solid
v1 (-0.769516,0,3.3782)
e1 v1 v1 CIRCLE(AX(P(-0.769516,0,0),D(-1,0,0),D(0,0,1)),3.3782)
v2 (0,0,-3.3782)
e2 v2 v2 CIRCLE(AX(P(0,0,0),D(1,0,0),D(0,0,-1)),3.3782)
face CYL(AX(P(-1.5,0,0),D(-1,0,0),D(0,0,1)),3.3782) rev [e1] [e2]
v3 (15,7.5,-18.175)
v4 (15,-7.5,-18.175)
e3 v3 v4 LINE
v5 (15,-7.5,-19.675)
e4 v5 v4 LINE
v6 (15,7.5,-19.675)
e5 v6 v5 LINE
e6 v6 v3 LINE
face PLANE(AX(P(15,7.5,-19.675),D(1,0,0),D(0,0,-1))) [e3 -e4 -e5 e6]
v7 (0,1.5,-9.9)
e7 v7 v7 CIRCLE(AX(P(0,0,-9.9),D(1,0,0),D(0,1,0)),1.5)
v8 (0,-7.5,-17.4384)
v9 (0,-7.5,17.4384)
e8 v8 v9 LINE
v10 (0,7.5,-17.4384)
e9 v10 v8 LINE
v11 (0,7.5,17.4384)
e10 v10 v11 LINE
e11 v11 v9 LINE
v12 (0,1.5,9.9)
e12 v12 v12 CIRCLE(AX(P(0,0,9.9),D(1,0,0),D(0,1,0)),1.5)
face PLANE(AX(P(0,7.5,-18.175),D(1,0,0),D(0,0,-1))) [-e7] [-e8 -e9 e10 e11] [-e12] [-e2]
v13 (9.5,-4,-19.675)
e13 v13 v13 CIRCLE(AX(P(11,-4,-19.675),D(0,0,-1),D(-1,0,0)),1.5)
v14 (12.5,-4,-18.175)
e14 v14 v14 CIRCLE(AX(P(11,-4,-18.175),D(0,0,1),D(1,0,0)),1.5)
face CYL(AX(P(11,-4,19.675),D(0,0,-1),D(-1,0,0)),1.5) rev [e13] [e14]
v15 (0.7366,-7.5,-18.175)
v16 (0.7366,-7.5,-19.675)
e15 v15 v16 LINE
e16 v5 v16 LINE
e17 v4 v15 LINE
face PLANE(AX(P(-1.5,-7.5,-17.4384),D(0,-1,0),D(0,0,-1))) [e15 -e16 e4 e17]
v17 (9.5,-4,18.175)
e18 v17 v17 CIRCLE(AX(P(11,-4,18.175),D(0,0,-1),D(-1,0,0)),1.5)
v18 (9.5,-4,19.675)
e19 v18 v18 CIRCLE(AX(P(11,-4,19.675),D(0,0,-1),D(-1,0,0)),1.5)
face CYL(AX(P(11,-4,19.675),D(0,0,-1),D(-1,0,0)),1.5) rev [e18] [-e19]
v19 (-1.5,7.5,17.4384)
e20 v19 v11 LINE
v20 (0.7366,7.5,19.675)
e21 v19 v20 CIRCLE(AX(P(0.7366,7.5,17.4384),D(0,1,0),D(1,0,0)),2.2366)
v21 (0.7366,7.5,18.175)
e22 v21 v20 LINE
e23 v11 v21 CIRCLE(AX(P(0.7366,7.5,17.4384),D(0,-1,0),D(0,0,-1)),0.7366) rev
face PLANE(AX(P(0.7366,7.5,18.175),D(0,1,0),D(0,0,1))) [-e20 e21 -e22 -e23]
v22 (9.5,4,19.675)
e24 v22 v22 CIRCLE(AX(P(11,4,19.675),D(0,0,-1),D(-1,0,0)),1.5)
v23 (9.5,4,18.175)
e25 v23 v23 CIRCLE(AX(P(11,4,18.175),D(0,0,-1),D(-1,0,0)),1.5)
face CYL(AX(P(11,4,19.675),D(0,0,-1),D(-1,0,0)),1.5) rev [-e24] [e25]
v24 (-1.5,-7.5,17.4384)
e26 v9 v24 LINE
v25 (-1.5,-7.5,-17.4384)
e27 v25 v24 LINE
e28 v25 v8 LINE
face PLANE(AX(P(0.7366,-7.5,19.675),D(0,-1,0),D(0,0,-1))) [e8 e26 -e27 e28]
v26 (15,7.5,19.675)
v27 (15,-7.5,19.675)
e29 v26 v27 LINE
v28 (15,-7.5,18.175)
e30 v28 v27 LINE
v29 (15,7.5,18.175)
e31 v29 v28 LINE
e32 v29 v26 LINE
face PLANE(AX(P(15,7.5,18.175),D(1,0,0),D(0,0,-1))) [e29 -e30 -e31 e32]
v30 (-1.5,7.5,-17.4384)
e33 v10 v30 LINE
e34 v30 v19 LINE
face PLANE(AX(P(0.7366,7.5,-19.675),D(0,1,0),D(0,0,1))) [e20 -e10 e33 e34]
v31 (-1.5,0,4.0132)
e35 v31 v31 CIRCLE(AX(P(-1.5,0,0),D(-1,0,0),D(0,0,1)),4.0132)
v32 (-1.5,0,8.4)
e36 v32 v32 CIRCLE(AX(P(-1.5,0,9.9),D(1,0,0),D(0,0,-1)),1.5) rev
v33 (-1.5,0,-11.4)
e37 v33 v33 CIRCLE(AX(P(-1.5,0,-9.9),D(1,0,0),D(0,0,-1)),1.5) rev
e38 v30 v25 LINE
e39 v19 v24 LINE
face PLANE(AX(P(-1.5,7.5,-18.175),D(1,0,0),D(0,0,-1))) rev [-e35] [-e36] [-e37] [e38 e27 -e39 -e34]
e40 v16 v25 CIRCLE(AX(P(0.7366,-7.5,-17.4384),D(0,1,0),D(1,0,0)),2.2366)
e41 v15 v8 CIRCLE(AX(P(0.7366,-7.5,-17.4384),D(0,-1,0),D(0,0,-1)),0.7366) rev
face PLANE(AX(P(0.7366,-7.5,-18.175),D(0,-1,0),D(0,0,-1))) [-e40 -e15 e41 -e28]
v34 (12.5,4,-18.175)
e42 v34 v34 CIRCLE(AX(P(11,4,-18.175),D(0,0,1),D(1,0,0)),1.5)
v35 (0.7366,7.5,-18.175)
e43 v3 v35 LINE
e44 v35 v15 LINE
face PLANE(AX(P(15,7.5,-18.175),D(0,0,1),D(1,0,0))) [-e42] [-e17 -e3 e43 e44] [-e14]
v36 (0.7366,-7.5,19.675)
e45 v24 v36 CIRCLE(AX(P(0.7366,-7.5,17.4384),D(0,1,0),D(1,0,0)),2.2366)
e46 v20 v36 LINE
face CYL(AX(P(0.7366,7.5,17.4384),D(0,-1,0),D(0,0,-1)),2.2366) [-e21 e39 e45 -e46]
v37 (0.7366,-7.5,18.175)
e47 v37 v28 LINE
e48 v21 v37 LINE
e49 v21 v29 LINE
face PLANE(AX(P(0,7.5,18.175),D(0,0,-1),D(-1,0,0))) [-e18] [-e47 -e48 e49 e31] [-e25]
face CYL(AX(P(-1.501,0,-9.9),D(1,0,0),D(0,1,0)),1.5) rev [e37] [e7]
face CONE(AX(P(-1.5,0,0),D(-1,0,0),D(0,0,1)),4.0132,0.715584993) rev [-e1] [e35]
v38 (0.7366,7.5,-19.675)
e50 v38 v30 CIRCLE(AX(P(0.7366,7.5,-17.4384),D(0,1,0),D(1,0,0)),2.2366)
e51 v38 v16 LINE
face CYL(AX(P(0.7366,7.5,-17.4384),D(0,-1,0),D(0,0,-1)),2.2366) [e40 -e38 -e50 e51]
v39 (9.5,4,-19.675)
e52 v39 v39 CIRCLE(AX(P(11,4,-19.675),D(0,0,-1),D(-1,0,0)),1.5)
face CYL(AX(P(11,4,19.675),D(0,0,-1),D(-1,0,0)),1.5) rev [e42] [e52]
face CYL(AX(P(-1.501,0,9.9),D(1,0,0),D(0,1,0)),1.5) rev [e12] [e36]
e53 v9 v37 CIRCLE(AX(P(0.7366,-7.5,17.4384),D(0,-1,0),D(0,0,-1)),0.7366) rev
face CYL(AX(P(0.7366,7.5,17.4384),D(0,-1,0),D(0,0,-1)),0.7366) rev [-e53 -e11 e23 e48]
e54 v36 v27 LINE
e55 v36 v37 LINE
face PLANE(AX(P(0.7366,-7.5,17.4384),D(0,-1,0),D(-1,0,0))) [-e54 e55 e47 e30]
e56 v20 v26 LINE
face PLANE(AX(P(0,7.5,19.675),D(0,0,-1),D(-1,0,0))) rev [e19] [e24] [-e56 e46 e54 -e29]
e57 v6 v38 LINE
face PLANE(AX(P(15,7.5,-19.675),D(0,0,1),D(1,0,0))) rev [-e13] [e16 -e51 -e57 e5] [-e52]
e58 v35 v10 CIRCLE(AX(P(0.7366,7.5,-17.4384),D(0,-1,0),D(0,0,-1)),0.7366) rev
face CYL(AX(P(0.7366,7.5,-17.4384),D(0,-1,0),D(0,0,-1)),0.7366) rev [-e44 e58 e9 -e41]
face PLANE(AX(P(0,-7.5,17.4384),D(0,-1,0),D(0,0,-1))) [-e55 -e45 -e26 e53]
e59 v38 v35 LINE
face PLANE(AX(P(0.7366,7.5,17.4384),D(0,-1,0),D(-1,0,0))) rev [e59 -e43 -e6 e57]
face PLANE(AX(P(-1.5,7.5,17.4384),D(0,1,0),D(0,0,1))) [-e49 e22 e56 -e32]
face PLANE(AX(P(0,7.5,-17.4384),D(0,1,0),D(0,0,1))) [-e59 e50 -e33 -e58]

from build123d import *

# Parameters (mm, degrees)
BRIDA_BASE2_DEPTH                       = 7.5
CROQUIS10_R                             = 1.5
CORTAR_EXTRUIR1_DEPTH                   = 43.774671244
CORTAR_EXTRUIR2_REACH                   = 27.853
CROQUIS13_R                             = 1.5
TALADRO_DE_MARGEN_PARA_1_41_D           = 6.7564
TALADRO_DE_MARGEN_PARA_1_41_DEPTH       = 3.65
TALADRO_DE_MARGEN_PARA_1_41_CSINK_D     = 8.0264
TALADRO_DE_MARGEN_PARA_1_41_CSINK_ANGLE = 82
TALADRO_DE_MARGEN_PARA_1_41_TIP         = 2.029827343


# Sheet-metal steps are written as plain solids
with BuildPart() as part:
    # Croquis1 → Brida base2 (new, symmetric)
    with BuildSketch(Plane(origin=(122.052362923, 0, 0), x_dir=(1, 0, 0), z_dir=(0, 1, 0))):
        with BuildLine():
            Line((-107.052362923, 18.175), (-121.315762923, 18.175))
            ThreePointArc((-121.315762923, 18.175), (-121.836617778, 17.959254855), (-122.052362923, 17.4384))
            Line((-122.052362923, 17.4384), (-122.052362923, -17.4384))
            ThreePointArc((-122.052362923, -17.4384), (-121.836617778, -17.959254855), (-121.315762923, -18.175))
            Line((-121.315762923, -18.175), (-107.052362923, -18.175))
            Line((-107.052362923, -18.175), (-107.052362923, -19.675))
            Line((-107.052362923, -19.675), (-121.315762923, -19.675))
            ThreePointArc((-121.315762923, -19.675), (-122.89727795, -19.019915027), (-123.552362923, -17.4384))
            Line((-123.552362923, -17.4384), (-123.552362923, 17.4384))
            ThreePointArc((-123.552362923, 17.4384), (-122.89727795, 19.019915027), (-121.315762923, 19.675))
            Line((-121.315762923, 19.675), (-107.052362923, 19.675))
            Line((-107.052362923, 19.675), (-107.052362923, 18.175))
        make_face()
    extrude(amount=BRIDA_BASE2_DEPTH, both=True)

    # Croquis10 → Cortar-Extruir1 (cut, through all)
    with BuildSketch(Plane(origin=(0, 0, -19.675), x_dir=(-1, 0, 0), z_dir=(0, 0, -1))):
        with Locations((-11, 4)):
            Circle(CROQUIS10_R)
        with Locations((-11, -4)):
            Circle(CROQUIS10_R)
    extrude(amount=-CORTAR_EXTRUIR1_DEPTH, mode=Mode.SUBTRACT)

    # Croquis13 → Cortar-Extruir2 (cut, up to next)
    with BuildSketch(Plane(origin=(0, 0, 0), x_dir=(0, 0, 1), z_dir=(1, 0, 0)), mode=Mode.PRIVATE) as cortar_extruir2_sk1:
        with Locations(Location((-9.9, 0, 0), (0, 0, 270))):
            Circle(CROQUIS13_R)
    cortar_extruir2_tool1 = extrude(cortar_extruir2_sk1.sketch, amount=-CORTAR_EXTRUIR2_REACH, mode=Mode.PRIVATE) & part.part
    # Croquis13 → Cortar-Extruir2 (cut, up to next)
    with BuildSketch(Plane(origin=(0, 0, 0), x_dir=(0, 0, 1), z_dir=(1, 0, 0)), mode=Mode.PRIVATE) as cortar_extruir2_sk2:
        with Locations(Location((9.9, 0, 0), (0, 0, 270))):
            Circle(CROQUIS13_R)
    cortar_extruir2_tool2 = extrude(cortar_extruir2_sk2.sketch, amount=-CORTAR_EXTRUIR2_REACH, mode=Mode.PRIVATE) & part.part
    add(cortar_extruir2_tool1.solids().sort_by_distance((0, 0, -9.9))[0], mode=Mode.SUBTRACT)
    add(cortar_extruir2_tool2.solids().sort_by_distance((0, 0, 9.9))[0], mode=Mode.SUBTRACT)

    # Taladro de margen para 1/41
    with Locations(Plane.ZY.offset(1.5)):
        with Locations((0, 0)):
            CounterSinkHole(TALADRO_DE_MARGEN_PARA_1_41_D / 2, TALADRO_DE_MARGEN_PARA_1_41_CSINK_D / 2, depth=TALADRO_DE_MARGEN_PARA_1_41_DEPTH, counter_sink_angle=TALADRO_DE_MARGEN_PARA_1_41_CSINK_ANGLE)
            with Locations((0, 0, -(TALADRO_DE_MARGEN_PARA_1_41_DEPTH + TALADRO_DE_MARGEN_PARA_1_41_TIP / 2))):  # 118° drill point
                Cone(0, TALADRO_DE_MARGEN_PARA_1_41_D / 2, TALADRO_DE_MARGEN_PARA_1_41_TIP, mode=Mode.SUBTRACT)


solid = part.part
